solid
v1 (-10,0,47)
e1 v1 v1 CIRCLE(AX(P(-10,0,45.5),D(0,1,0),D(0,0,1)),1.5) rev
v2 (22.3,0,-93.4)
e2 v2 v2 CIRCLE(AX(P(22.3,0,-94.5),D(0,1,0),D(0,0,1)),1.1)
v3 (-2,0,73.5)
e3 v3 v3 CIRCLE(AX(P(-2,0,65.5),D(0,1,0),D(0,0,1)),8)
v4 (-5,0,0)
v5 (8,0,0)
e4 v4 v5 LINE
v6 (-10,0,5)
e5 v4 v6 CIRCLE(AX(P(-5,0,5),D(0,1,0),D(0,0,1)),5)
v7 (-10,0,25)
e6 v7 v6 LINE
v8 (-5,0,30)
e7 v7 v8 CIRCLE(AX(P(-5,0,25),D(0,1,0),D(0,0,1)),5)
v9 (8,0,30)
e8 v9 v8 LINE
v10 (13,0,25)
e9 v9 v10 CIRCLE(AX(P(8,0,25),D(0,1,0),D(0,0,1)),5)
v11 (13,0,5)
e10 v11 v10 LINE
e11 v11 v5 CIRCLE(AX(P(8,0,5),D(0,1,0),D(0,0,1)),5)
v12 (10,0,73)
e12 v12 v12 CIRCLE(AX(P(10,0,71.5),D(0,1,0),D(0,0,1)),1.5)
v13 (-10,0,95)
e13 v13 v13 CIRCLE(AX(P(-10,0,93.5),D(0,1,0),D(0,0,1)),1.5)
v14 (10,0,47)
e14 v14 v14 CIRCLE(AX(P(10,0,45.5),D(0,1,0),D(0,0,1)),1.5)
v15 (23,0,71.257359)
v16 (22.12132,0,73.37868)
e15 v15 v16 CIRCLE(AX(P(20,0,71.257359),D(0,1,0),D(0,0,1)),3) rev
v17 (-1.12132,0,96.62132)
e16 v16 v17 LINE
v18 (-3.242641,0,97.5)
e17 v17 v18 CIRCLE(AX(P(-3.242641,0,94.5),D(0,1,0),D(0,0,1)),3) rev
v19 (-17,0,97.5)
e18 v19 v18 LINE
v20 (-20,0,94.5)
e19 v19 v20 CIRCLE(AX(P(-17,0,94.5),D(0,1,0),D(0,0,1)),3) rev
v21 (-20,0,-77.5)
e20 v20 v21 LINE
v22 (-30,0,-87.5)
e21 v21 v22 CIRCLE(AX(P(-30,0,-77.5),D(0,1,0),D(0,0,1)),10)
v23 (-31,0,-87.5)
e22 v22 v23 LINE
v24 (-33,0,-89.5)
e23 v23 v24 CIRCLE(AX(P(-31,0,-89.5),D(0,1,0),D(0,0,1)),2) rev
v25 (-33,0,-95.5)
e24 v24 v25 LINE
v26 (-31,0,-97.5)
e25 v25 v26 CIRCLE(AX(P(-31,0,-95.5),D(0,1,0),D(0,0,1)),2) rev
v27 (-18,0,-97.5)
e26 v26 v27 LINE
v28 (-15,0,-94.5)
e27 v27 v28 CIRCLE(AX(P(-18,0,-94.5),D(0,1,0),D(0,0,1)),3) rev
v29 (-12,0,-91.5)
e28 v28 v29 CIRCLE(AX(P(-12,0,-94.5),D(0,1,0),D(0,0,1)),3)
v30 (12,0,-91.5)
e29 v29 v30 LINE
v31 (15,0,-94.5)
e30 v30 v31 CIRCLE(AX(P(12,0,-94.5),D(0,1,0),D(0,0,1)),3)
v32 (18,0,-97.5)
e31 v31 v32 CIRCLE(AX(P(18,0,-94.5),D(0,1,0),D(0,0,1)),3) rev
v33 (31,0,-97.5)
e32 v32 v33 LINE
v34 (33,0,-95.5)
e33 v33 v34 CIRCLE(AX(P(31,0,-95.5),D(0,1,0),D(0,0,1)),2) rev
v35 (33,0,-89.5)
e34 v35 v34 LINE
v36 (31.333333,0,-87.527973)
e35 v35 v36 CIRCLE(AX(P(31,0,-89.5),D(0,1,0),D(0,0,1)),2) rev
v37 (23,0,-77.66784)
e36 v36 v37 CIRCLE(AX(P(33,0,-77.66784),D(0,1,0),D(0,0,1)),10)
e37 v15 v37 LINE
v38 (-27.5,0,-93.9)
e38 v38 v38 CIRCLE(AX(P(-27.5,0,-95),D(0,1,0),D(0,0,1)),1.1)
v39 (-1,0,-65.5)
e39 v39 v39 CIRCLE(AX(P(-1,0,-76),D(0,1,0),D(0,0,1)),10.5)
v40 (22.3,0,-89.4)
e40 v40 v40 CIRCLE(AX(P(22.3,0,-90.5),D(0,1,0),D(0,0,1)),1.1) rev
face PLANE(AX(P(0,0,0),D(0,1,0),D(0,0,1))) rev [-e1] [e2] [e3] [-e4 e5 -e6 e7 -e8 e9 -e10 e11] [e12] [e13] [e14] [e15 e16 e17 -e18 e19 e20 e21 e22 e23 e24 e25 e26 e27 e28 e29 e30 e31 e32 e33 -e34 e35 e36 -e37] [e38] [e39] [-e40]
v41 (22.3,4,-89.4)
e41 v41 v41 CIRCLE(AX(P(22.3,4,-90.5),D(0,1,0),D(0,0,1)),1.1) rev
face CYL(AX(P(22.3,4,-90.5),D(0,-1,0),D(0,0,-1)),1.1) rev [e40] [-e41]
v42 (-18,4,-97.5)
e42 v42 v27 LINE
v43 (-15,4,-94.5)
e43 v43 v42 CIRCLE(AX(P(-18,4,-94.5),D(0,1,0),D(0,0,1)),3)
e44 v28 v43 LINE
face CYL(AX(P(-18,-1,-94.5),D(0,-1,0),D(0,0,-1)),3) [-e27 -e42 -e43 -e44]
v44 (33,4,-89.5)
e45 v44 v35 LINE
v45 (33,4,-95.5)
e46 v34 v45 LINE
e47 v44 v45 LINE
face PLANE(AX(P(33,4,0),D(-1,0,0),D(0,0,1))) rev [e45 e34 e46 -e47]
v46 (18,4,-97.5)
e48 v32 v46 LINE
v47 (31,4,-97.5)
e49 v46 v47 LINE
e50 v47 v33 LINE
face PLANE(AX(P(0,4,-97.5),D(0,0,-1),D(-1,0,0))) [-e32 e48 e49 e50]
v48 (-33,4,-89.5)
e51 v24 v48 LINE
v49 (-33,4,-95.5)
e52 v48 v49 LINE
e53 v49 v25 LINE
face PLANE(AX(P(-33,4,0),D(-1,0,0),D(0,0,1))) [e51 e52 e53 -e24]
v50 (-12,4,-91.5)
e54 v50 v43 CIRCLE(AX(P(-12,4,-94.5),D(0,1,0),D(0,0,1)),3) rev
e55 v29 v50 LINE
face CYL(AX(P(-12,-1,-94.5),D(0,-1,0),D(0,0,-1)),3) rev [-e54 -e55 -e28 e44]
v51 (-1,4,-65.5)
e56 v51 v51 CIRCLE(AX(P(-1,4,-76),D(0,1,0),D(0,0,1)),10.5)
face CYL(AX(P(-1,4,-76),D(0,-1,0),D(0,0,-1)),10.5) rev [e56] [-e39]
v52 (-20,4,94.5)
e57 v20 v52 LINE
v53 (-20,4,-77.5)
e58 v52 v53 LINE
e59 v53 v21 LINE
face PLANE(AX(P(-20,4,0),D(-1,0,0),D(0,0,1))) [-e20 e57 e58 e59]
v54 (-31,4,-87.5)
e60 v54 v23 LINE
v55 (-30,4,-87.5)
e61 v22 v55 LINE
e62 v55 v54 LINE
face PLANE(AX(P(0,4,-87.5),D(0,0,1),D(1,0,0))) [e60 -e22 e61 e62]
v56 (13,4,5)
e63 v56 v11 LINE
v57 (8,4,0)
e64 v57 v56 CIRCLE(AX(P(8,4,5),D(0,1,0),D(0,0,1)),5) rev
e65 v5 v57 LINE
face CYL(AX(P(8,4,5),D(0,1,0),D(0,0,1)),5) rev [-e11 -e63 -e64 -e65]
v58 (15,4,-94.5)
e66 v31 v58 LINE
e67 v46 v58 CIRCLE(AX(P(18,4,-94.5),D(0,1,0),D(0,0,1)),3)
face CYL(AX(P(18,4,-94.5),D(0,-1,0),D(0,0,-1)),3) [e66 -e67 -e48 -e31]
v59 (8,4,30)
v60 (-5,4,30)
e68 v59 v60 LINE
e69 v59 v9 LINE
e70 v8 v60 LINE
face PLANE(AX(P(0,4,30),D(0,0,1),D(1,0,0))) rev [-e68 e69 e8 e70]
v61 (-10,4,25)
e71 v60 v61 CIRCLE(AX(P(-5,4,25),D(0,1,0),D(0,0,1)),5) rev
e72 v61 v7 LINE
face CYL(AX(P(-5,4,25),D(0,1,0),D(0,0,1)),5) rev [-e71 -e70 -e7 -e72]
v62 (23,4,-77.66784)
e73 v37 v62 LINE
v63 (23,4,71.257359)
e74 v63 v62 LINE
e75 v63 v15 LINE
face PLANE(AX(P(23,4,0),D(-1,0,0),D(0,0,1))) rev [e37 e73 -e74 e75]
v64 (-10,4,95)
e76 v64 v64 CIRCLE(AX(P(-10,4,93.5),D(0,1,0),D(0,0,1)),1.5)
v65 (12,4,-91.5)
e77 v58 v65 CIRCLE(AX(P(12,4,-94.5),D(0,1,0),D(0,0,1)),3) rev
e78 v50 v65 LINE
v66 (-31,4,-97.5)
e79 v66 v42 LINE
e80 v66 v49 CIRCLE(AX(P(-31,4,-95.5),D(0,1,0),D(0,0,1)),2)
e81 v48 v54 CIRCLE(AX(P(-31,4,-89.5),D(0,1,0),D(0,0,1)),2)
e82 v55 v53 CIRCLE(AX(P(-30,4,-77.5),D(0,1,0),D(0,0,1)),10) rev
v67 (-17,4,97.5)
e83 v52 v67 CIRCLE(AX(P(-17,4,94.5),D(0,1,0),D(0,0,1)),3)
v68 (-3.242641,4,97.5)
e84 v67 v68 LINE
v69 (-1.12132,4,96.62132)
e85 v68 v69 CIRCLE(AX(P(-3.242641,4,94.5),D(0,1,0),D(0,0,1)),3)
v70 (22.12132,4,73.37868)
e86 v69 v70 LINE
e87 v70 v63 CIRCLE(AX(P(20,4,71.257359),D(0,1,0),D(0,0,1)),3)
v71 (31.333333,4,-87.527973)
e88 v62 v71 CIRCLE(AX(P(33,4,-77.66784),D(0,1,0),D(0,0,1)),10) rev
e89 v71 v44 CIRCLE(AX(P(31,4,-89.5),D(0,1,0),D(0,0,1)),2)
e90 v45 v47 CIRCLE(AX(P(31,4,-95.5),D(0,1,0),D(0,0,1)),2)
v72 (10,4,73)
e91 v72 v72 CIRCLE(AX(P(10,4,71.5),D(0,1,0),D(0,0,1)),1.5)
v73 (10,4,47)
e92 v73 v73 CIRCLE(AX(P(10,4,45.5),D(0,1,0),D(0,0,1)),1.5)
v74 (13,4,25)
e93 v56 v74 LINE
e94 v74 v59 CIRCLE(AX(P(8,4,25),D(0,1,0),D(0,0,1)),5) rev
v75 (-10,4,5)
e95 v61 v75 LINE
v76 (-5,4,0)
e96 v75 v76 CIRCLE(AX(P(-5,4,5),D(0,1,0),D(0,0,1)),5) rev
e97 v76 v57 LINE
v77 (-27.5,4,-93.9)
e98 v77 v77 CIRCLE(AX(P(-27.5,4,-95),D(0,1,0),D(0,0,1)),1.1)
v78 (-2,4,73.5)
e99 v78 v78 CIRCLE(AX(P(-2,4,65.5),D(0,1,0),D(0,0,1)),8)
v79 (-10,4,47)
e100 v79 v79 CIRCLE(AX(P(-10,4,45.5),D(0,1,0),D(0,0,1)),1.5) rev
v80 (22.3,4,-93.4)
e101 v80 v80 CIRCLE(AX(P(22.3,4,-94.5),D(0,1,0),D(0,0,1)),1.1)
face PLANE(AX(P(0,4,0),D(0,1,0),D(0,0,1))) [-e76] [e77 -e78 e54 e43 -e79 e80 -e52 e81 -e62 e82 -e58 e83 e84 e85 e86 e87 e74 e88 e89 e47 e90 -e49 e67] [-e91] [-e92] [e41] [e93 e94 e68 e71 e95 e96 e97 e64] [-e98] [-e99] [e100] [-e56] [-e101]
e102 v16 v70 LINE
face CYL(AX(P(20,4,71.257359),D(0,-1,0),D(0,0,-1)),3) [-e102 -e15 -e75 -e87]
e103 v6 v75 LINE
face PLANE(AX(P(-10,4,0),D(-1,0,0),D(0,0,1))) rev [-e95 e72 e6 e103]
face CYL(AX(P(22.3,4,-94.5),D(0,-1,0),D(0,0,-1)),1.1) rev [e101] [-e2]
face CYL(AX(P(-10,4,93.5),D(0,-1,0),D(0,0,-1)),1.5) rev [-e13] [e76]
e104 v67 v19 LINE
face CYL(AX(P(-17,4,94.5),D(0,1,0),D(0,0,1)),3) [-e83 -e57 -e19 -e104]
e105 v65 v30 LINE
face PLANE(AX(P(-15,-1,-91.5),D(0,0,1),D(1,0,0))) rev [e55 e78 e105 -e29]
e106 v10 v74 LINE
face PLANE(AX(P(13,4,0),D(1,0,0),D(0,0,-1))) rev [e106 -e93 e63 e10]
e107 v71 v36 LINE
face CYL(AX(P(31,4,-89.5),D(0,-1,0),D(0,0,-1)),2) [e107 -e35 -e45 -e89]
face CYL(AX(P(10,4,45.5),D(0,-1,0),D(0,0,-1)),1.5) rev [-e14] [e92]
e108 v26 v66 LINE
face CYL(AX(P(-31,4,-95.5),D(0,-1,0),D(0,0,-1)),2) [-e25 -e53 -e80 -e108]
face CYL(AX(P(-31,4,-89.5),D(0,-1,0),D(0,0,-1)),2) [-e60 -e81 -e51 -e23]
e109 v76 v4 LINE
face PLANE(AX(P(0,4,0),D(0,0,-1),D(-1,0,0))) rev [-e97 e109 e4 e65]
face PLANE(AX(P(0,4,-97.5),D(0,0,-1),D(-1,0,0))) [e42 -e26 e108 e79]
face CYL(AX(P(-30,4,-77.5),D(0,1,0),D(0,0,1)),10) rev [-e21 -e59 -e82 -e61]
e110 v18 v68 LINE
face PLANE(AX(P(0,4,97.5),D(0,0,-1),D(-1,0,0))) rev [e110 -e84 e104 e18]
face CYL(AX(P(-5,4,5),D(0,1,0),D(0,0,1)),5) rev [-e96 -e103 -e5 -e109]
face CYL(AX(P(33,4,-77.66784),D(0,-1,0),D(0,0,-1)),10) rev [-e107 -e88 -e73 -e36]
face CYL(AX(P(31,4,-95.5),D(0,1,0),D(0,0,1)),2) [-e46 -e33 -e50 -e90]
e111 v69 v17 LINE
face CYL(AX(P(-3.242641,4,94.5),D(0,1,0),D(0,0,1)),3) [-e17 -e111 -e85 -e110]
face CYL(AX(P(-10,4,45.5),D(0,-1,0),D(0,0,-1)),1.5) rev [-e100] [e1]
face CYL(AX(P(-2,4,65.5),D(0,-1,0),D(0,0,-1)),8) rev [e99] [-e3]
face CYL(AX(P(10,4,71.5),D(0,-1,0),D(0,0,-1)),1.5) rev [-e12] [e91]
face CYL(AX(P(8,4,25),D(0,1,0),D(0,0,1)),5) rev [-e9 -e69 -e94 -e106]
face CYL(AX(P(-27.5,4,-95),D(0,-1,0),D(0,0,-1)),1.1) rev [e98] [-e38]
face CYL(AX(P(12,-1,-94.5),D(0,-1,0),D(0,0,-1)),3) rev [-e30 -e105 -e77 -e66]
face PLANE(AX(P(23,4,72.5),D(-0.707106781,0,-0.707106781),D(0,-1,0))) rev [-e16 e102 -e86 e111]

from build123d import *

# Parameters (mm, degrees)
SKETCH_1_R          = 1.5
SKETCH_1_R_2        = 8
SKETCH_1_R_3        = 1.1
SKETCH_1_R_4        = 10.5
EXTRUDE_1_DEPTH     = 4
SKETCH_3_W          = 30
SKETCH_3_H          = 6
CUT_EXTRUDE_1_DEPTH = 5
FILLET_4_R          = 3
CHAMFER_1_SIZE      = 25
FILLET_8_R          = 5
FILLET_12_R         = 2
FILLET_13_R         = 3
FILLET_14_R         = 10


with BuildPart() as part:
    # 草图1 → 凸台-拉伸1 (new body)
    with BuildSketch(Plane(origin=(0, 0, 0), x_dir=(1, 0, 0), z_dir=(0, 1, 0))):
        Polygon((-20, 17.5), (-20, -97.5), (23, -97.5), (23, 17.5), (23, 87.5), (33, 87.5), (33, 97.5), (-33, 97.5), (-33, 87.5), (-20, 87.5), align=None)
        with Locations(Location((-10, -93.5, 0), (0, 0, 270))):
            Circle(SKETCH_1_R, mode=Mode.SUBTRACT)
        with Locations(Location((-2, -65.5, 0), (0, 0, 270))):
            Circle(SKETCH_1_R_2, mode=Mode.SUBTRACT)
        with Locations(Location((-10, -45.5, 0), (0, 0, 270))):
            Circle(SKETCH_1_R, mode=Mode.SUBTRACT)
        with Locations(Location((10, -71.5, 0), (0, 0, 270))):
            Circle(SKETCH_1_R, mode=Mode.SUBTRACT)
        with Locations(Location((10, -45.5, 0), (0, 0, 270))):
            Circle(SKETCH_1_R, mode=Mode.SUBTRACT)
        Polygon((-10, 0), (10, 0), (13, 0), (13, -30), (10, -30), (-10, -30), align=None, mode=Mode.SUBTRACT)
        with Locations(Location((-27.5, 95, 0), (0, 0, 270))):
            Circle(SKETCH_1_R_3, mode=Mode.SUBTRACT)
        with Locations(Location((-1, 76, 0), (0, 0, 270))):
            Circle(SKETCH_1_R_4, mode=Mode.SUBTRACT)
        with Locations(Location((22.3, 90.5, 0), (0, 0, 270))):
            Circle(SKETCH_1_R_3, mode=Mode.SUBTRACT)
        with Locations(Location((22.3, 94.5, 0), (0, 0, 270))):
            Circle(SKETCH_1_R_3, mode=Mode.SUBTRACT)
    extrude(amount=EXTRUDE_1_DEPTH)

    # 草图3 → 切除-拉伸1 (cut)
    with BuildSketch(Plane(origin=(0, 4, 0), x_dir=(1, 0, 0), z_dir=(0, 1, 0))):
        with Locations((0, 94.5)):
            Rectangle(SKETCH_3_W, SKETCH_3_H)
    extrude(amount=-CUT_EXTRUDE_1_DEPTH, mode=Mode.SUBTRACT)

    # 圆角4
    fillet_4_edges = [part.edges().sort_by_distance(p)[0] for p in [
        (15, 2, -91.5),
        (-15, 2, -91.5),
    ]]
    fillet(fillet_4_edges, radius=FILLET_4_R)
    fillet_4_2_edges = [part.edges().sort_by_distance(p)[0] for p in [
        (15, 2, -97.5),
        (-15, 2, -97.5),
    ]]
    fillet(fillet_4_2_edges, radius=FILLET_4_R - 0.0001)  # a hair under: the kernel refuses the full size

    # 倒角1
    chamfer_1_edges = [part.edges().sort_by_distance(p)[0] for p in [
        (23, 2, 97.5),
    ]]
    chamfer(chamfer_1_edges, length=CHAMFER_1_SIZE)

    # 圆角8
    fillet_8_edges = [part.edges().sort_by_distance(p)[0] for p in [
        (13, 2, 0),
        (-10, 2, 0),
        (-10, 2, 30),
        (13, 2, 30),
    ]]
    fillet(fillet_8_edges, radius=FILLET_8_R)

    # 圆角12
    fillet_12_edges = [part.edges().sort_by_distance(p)[0] for p in [
        (-33, 2, -87.5),
        (-33, 2, -97.5),
        (33, 2, -97.5),
        (33, 2, -87.5),
    ]]
    fillet(fillet_12_edges, radius=FILLET_12_R)

    # 圆角13
    fillet_13_edges = [part.edges().sort_by_distance(p)[0] for p in [
        (23, 2, 72.5),
        (-2, 2, 97.5),
        (-20, 2, 97.5),
    ]]
    fillet(fillet_13_edges, radius=FILLET_13_R)

    # 圆角14
    fillet_14_edges = [part.edges().sort_by_distance(p)[0] for p in [
        (23, 2, -87.5),
        (-20, 2, -87.5),
    ]]
    fillet(fillet_14_edges, radius=FILLET_14_R)


solid = part.part
